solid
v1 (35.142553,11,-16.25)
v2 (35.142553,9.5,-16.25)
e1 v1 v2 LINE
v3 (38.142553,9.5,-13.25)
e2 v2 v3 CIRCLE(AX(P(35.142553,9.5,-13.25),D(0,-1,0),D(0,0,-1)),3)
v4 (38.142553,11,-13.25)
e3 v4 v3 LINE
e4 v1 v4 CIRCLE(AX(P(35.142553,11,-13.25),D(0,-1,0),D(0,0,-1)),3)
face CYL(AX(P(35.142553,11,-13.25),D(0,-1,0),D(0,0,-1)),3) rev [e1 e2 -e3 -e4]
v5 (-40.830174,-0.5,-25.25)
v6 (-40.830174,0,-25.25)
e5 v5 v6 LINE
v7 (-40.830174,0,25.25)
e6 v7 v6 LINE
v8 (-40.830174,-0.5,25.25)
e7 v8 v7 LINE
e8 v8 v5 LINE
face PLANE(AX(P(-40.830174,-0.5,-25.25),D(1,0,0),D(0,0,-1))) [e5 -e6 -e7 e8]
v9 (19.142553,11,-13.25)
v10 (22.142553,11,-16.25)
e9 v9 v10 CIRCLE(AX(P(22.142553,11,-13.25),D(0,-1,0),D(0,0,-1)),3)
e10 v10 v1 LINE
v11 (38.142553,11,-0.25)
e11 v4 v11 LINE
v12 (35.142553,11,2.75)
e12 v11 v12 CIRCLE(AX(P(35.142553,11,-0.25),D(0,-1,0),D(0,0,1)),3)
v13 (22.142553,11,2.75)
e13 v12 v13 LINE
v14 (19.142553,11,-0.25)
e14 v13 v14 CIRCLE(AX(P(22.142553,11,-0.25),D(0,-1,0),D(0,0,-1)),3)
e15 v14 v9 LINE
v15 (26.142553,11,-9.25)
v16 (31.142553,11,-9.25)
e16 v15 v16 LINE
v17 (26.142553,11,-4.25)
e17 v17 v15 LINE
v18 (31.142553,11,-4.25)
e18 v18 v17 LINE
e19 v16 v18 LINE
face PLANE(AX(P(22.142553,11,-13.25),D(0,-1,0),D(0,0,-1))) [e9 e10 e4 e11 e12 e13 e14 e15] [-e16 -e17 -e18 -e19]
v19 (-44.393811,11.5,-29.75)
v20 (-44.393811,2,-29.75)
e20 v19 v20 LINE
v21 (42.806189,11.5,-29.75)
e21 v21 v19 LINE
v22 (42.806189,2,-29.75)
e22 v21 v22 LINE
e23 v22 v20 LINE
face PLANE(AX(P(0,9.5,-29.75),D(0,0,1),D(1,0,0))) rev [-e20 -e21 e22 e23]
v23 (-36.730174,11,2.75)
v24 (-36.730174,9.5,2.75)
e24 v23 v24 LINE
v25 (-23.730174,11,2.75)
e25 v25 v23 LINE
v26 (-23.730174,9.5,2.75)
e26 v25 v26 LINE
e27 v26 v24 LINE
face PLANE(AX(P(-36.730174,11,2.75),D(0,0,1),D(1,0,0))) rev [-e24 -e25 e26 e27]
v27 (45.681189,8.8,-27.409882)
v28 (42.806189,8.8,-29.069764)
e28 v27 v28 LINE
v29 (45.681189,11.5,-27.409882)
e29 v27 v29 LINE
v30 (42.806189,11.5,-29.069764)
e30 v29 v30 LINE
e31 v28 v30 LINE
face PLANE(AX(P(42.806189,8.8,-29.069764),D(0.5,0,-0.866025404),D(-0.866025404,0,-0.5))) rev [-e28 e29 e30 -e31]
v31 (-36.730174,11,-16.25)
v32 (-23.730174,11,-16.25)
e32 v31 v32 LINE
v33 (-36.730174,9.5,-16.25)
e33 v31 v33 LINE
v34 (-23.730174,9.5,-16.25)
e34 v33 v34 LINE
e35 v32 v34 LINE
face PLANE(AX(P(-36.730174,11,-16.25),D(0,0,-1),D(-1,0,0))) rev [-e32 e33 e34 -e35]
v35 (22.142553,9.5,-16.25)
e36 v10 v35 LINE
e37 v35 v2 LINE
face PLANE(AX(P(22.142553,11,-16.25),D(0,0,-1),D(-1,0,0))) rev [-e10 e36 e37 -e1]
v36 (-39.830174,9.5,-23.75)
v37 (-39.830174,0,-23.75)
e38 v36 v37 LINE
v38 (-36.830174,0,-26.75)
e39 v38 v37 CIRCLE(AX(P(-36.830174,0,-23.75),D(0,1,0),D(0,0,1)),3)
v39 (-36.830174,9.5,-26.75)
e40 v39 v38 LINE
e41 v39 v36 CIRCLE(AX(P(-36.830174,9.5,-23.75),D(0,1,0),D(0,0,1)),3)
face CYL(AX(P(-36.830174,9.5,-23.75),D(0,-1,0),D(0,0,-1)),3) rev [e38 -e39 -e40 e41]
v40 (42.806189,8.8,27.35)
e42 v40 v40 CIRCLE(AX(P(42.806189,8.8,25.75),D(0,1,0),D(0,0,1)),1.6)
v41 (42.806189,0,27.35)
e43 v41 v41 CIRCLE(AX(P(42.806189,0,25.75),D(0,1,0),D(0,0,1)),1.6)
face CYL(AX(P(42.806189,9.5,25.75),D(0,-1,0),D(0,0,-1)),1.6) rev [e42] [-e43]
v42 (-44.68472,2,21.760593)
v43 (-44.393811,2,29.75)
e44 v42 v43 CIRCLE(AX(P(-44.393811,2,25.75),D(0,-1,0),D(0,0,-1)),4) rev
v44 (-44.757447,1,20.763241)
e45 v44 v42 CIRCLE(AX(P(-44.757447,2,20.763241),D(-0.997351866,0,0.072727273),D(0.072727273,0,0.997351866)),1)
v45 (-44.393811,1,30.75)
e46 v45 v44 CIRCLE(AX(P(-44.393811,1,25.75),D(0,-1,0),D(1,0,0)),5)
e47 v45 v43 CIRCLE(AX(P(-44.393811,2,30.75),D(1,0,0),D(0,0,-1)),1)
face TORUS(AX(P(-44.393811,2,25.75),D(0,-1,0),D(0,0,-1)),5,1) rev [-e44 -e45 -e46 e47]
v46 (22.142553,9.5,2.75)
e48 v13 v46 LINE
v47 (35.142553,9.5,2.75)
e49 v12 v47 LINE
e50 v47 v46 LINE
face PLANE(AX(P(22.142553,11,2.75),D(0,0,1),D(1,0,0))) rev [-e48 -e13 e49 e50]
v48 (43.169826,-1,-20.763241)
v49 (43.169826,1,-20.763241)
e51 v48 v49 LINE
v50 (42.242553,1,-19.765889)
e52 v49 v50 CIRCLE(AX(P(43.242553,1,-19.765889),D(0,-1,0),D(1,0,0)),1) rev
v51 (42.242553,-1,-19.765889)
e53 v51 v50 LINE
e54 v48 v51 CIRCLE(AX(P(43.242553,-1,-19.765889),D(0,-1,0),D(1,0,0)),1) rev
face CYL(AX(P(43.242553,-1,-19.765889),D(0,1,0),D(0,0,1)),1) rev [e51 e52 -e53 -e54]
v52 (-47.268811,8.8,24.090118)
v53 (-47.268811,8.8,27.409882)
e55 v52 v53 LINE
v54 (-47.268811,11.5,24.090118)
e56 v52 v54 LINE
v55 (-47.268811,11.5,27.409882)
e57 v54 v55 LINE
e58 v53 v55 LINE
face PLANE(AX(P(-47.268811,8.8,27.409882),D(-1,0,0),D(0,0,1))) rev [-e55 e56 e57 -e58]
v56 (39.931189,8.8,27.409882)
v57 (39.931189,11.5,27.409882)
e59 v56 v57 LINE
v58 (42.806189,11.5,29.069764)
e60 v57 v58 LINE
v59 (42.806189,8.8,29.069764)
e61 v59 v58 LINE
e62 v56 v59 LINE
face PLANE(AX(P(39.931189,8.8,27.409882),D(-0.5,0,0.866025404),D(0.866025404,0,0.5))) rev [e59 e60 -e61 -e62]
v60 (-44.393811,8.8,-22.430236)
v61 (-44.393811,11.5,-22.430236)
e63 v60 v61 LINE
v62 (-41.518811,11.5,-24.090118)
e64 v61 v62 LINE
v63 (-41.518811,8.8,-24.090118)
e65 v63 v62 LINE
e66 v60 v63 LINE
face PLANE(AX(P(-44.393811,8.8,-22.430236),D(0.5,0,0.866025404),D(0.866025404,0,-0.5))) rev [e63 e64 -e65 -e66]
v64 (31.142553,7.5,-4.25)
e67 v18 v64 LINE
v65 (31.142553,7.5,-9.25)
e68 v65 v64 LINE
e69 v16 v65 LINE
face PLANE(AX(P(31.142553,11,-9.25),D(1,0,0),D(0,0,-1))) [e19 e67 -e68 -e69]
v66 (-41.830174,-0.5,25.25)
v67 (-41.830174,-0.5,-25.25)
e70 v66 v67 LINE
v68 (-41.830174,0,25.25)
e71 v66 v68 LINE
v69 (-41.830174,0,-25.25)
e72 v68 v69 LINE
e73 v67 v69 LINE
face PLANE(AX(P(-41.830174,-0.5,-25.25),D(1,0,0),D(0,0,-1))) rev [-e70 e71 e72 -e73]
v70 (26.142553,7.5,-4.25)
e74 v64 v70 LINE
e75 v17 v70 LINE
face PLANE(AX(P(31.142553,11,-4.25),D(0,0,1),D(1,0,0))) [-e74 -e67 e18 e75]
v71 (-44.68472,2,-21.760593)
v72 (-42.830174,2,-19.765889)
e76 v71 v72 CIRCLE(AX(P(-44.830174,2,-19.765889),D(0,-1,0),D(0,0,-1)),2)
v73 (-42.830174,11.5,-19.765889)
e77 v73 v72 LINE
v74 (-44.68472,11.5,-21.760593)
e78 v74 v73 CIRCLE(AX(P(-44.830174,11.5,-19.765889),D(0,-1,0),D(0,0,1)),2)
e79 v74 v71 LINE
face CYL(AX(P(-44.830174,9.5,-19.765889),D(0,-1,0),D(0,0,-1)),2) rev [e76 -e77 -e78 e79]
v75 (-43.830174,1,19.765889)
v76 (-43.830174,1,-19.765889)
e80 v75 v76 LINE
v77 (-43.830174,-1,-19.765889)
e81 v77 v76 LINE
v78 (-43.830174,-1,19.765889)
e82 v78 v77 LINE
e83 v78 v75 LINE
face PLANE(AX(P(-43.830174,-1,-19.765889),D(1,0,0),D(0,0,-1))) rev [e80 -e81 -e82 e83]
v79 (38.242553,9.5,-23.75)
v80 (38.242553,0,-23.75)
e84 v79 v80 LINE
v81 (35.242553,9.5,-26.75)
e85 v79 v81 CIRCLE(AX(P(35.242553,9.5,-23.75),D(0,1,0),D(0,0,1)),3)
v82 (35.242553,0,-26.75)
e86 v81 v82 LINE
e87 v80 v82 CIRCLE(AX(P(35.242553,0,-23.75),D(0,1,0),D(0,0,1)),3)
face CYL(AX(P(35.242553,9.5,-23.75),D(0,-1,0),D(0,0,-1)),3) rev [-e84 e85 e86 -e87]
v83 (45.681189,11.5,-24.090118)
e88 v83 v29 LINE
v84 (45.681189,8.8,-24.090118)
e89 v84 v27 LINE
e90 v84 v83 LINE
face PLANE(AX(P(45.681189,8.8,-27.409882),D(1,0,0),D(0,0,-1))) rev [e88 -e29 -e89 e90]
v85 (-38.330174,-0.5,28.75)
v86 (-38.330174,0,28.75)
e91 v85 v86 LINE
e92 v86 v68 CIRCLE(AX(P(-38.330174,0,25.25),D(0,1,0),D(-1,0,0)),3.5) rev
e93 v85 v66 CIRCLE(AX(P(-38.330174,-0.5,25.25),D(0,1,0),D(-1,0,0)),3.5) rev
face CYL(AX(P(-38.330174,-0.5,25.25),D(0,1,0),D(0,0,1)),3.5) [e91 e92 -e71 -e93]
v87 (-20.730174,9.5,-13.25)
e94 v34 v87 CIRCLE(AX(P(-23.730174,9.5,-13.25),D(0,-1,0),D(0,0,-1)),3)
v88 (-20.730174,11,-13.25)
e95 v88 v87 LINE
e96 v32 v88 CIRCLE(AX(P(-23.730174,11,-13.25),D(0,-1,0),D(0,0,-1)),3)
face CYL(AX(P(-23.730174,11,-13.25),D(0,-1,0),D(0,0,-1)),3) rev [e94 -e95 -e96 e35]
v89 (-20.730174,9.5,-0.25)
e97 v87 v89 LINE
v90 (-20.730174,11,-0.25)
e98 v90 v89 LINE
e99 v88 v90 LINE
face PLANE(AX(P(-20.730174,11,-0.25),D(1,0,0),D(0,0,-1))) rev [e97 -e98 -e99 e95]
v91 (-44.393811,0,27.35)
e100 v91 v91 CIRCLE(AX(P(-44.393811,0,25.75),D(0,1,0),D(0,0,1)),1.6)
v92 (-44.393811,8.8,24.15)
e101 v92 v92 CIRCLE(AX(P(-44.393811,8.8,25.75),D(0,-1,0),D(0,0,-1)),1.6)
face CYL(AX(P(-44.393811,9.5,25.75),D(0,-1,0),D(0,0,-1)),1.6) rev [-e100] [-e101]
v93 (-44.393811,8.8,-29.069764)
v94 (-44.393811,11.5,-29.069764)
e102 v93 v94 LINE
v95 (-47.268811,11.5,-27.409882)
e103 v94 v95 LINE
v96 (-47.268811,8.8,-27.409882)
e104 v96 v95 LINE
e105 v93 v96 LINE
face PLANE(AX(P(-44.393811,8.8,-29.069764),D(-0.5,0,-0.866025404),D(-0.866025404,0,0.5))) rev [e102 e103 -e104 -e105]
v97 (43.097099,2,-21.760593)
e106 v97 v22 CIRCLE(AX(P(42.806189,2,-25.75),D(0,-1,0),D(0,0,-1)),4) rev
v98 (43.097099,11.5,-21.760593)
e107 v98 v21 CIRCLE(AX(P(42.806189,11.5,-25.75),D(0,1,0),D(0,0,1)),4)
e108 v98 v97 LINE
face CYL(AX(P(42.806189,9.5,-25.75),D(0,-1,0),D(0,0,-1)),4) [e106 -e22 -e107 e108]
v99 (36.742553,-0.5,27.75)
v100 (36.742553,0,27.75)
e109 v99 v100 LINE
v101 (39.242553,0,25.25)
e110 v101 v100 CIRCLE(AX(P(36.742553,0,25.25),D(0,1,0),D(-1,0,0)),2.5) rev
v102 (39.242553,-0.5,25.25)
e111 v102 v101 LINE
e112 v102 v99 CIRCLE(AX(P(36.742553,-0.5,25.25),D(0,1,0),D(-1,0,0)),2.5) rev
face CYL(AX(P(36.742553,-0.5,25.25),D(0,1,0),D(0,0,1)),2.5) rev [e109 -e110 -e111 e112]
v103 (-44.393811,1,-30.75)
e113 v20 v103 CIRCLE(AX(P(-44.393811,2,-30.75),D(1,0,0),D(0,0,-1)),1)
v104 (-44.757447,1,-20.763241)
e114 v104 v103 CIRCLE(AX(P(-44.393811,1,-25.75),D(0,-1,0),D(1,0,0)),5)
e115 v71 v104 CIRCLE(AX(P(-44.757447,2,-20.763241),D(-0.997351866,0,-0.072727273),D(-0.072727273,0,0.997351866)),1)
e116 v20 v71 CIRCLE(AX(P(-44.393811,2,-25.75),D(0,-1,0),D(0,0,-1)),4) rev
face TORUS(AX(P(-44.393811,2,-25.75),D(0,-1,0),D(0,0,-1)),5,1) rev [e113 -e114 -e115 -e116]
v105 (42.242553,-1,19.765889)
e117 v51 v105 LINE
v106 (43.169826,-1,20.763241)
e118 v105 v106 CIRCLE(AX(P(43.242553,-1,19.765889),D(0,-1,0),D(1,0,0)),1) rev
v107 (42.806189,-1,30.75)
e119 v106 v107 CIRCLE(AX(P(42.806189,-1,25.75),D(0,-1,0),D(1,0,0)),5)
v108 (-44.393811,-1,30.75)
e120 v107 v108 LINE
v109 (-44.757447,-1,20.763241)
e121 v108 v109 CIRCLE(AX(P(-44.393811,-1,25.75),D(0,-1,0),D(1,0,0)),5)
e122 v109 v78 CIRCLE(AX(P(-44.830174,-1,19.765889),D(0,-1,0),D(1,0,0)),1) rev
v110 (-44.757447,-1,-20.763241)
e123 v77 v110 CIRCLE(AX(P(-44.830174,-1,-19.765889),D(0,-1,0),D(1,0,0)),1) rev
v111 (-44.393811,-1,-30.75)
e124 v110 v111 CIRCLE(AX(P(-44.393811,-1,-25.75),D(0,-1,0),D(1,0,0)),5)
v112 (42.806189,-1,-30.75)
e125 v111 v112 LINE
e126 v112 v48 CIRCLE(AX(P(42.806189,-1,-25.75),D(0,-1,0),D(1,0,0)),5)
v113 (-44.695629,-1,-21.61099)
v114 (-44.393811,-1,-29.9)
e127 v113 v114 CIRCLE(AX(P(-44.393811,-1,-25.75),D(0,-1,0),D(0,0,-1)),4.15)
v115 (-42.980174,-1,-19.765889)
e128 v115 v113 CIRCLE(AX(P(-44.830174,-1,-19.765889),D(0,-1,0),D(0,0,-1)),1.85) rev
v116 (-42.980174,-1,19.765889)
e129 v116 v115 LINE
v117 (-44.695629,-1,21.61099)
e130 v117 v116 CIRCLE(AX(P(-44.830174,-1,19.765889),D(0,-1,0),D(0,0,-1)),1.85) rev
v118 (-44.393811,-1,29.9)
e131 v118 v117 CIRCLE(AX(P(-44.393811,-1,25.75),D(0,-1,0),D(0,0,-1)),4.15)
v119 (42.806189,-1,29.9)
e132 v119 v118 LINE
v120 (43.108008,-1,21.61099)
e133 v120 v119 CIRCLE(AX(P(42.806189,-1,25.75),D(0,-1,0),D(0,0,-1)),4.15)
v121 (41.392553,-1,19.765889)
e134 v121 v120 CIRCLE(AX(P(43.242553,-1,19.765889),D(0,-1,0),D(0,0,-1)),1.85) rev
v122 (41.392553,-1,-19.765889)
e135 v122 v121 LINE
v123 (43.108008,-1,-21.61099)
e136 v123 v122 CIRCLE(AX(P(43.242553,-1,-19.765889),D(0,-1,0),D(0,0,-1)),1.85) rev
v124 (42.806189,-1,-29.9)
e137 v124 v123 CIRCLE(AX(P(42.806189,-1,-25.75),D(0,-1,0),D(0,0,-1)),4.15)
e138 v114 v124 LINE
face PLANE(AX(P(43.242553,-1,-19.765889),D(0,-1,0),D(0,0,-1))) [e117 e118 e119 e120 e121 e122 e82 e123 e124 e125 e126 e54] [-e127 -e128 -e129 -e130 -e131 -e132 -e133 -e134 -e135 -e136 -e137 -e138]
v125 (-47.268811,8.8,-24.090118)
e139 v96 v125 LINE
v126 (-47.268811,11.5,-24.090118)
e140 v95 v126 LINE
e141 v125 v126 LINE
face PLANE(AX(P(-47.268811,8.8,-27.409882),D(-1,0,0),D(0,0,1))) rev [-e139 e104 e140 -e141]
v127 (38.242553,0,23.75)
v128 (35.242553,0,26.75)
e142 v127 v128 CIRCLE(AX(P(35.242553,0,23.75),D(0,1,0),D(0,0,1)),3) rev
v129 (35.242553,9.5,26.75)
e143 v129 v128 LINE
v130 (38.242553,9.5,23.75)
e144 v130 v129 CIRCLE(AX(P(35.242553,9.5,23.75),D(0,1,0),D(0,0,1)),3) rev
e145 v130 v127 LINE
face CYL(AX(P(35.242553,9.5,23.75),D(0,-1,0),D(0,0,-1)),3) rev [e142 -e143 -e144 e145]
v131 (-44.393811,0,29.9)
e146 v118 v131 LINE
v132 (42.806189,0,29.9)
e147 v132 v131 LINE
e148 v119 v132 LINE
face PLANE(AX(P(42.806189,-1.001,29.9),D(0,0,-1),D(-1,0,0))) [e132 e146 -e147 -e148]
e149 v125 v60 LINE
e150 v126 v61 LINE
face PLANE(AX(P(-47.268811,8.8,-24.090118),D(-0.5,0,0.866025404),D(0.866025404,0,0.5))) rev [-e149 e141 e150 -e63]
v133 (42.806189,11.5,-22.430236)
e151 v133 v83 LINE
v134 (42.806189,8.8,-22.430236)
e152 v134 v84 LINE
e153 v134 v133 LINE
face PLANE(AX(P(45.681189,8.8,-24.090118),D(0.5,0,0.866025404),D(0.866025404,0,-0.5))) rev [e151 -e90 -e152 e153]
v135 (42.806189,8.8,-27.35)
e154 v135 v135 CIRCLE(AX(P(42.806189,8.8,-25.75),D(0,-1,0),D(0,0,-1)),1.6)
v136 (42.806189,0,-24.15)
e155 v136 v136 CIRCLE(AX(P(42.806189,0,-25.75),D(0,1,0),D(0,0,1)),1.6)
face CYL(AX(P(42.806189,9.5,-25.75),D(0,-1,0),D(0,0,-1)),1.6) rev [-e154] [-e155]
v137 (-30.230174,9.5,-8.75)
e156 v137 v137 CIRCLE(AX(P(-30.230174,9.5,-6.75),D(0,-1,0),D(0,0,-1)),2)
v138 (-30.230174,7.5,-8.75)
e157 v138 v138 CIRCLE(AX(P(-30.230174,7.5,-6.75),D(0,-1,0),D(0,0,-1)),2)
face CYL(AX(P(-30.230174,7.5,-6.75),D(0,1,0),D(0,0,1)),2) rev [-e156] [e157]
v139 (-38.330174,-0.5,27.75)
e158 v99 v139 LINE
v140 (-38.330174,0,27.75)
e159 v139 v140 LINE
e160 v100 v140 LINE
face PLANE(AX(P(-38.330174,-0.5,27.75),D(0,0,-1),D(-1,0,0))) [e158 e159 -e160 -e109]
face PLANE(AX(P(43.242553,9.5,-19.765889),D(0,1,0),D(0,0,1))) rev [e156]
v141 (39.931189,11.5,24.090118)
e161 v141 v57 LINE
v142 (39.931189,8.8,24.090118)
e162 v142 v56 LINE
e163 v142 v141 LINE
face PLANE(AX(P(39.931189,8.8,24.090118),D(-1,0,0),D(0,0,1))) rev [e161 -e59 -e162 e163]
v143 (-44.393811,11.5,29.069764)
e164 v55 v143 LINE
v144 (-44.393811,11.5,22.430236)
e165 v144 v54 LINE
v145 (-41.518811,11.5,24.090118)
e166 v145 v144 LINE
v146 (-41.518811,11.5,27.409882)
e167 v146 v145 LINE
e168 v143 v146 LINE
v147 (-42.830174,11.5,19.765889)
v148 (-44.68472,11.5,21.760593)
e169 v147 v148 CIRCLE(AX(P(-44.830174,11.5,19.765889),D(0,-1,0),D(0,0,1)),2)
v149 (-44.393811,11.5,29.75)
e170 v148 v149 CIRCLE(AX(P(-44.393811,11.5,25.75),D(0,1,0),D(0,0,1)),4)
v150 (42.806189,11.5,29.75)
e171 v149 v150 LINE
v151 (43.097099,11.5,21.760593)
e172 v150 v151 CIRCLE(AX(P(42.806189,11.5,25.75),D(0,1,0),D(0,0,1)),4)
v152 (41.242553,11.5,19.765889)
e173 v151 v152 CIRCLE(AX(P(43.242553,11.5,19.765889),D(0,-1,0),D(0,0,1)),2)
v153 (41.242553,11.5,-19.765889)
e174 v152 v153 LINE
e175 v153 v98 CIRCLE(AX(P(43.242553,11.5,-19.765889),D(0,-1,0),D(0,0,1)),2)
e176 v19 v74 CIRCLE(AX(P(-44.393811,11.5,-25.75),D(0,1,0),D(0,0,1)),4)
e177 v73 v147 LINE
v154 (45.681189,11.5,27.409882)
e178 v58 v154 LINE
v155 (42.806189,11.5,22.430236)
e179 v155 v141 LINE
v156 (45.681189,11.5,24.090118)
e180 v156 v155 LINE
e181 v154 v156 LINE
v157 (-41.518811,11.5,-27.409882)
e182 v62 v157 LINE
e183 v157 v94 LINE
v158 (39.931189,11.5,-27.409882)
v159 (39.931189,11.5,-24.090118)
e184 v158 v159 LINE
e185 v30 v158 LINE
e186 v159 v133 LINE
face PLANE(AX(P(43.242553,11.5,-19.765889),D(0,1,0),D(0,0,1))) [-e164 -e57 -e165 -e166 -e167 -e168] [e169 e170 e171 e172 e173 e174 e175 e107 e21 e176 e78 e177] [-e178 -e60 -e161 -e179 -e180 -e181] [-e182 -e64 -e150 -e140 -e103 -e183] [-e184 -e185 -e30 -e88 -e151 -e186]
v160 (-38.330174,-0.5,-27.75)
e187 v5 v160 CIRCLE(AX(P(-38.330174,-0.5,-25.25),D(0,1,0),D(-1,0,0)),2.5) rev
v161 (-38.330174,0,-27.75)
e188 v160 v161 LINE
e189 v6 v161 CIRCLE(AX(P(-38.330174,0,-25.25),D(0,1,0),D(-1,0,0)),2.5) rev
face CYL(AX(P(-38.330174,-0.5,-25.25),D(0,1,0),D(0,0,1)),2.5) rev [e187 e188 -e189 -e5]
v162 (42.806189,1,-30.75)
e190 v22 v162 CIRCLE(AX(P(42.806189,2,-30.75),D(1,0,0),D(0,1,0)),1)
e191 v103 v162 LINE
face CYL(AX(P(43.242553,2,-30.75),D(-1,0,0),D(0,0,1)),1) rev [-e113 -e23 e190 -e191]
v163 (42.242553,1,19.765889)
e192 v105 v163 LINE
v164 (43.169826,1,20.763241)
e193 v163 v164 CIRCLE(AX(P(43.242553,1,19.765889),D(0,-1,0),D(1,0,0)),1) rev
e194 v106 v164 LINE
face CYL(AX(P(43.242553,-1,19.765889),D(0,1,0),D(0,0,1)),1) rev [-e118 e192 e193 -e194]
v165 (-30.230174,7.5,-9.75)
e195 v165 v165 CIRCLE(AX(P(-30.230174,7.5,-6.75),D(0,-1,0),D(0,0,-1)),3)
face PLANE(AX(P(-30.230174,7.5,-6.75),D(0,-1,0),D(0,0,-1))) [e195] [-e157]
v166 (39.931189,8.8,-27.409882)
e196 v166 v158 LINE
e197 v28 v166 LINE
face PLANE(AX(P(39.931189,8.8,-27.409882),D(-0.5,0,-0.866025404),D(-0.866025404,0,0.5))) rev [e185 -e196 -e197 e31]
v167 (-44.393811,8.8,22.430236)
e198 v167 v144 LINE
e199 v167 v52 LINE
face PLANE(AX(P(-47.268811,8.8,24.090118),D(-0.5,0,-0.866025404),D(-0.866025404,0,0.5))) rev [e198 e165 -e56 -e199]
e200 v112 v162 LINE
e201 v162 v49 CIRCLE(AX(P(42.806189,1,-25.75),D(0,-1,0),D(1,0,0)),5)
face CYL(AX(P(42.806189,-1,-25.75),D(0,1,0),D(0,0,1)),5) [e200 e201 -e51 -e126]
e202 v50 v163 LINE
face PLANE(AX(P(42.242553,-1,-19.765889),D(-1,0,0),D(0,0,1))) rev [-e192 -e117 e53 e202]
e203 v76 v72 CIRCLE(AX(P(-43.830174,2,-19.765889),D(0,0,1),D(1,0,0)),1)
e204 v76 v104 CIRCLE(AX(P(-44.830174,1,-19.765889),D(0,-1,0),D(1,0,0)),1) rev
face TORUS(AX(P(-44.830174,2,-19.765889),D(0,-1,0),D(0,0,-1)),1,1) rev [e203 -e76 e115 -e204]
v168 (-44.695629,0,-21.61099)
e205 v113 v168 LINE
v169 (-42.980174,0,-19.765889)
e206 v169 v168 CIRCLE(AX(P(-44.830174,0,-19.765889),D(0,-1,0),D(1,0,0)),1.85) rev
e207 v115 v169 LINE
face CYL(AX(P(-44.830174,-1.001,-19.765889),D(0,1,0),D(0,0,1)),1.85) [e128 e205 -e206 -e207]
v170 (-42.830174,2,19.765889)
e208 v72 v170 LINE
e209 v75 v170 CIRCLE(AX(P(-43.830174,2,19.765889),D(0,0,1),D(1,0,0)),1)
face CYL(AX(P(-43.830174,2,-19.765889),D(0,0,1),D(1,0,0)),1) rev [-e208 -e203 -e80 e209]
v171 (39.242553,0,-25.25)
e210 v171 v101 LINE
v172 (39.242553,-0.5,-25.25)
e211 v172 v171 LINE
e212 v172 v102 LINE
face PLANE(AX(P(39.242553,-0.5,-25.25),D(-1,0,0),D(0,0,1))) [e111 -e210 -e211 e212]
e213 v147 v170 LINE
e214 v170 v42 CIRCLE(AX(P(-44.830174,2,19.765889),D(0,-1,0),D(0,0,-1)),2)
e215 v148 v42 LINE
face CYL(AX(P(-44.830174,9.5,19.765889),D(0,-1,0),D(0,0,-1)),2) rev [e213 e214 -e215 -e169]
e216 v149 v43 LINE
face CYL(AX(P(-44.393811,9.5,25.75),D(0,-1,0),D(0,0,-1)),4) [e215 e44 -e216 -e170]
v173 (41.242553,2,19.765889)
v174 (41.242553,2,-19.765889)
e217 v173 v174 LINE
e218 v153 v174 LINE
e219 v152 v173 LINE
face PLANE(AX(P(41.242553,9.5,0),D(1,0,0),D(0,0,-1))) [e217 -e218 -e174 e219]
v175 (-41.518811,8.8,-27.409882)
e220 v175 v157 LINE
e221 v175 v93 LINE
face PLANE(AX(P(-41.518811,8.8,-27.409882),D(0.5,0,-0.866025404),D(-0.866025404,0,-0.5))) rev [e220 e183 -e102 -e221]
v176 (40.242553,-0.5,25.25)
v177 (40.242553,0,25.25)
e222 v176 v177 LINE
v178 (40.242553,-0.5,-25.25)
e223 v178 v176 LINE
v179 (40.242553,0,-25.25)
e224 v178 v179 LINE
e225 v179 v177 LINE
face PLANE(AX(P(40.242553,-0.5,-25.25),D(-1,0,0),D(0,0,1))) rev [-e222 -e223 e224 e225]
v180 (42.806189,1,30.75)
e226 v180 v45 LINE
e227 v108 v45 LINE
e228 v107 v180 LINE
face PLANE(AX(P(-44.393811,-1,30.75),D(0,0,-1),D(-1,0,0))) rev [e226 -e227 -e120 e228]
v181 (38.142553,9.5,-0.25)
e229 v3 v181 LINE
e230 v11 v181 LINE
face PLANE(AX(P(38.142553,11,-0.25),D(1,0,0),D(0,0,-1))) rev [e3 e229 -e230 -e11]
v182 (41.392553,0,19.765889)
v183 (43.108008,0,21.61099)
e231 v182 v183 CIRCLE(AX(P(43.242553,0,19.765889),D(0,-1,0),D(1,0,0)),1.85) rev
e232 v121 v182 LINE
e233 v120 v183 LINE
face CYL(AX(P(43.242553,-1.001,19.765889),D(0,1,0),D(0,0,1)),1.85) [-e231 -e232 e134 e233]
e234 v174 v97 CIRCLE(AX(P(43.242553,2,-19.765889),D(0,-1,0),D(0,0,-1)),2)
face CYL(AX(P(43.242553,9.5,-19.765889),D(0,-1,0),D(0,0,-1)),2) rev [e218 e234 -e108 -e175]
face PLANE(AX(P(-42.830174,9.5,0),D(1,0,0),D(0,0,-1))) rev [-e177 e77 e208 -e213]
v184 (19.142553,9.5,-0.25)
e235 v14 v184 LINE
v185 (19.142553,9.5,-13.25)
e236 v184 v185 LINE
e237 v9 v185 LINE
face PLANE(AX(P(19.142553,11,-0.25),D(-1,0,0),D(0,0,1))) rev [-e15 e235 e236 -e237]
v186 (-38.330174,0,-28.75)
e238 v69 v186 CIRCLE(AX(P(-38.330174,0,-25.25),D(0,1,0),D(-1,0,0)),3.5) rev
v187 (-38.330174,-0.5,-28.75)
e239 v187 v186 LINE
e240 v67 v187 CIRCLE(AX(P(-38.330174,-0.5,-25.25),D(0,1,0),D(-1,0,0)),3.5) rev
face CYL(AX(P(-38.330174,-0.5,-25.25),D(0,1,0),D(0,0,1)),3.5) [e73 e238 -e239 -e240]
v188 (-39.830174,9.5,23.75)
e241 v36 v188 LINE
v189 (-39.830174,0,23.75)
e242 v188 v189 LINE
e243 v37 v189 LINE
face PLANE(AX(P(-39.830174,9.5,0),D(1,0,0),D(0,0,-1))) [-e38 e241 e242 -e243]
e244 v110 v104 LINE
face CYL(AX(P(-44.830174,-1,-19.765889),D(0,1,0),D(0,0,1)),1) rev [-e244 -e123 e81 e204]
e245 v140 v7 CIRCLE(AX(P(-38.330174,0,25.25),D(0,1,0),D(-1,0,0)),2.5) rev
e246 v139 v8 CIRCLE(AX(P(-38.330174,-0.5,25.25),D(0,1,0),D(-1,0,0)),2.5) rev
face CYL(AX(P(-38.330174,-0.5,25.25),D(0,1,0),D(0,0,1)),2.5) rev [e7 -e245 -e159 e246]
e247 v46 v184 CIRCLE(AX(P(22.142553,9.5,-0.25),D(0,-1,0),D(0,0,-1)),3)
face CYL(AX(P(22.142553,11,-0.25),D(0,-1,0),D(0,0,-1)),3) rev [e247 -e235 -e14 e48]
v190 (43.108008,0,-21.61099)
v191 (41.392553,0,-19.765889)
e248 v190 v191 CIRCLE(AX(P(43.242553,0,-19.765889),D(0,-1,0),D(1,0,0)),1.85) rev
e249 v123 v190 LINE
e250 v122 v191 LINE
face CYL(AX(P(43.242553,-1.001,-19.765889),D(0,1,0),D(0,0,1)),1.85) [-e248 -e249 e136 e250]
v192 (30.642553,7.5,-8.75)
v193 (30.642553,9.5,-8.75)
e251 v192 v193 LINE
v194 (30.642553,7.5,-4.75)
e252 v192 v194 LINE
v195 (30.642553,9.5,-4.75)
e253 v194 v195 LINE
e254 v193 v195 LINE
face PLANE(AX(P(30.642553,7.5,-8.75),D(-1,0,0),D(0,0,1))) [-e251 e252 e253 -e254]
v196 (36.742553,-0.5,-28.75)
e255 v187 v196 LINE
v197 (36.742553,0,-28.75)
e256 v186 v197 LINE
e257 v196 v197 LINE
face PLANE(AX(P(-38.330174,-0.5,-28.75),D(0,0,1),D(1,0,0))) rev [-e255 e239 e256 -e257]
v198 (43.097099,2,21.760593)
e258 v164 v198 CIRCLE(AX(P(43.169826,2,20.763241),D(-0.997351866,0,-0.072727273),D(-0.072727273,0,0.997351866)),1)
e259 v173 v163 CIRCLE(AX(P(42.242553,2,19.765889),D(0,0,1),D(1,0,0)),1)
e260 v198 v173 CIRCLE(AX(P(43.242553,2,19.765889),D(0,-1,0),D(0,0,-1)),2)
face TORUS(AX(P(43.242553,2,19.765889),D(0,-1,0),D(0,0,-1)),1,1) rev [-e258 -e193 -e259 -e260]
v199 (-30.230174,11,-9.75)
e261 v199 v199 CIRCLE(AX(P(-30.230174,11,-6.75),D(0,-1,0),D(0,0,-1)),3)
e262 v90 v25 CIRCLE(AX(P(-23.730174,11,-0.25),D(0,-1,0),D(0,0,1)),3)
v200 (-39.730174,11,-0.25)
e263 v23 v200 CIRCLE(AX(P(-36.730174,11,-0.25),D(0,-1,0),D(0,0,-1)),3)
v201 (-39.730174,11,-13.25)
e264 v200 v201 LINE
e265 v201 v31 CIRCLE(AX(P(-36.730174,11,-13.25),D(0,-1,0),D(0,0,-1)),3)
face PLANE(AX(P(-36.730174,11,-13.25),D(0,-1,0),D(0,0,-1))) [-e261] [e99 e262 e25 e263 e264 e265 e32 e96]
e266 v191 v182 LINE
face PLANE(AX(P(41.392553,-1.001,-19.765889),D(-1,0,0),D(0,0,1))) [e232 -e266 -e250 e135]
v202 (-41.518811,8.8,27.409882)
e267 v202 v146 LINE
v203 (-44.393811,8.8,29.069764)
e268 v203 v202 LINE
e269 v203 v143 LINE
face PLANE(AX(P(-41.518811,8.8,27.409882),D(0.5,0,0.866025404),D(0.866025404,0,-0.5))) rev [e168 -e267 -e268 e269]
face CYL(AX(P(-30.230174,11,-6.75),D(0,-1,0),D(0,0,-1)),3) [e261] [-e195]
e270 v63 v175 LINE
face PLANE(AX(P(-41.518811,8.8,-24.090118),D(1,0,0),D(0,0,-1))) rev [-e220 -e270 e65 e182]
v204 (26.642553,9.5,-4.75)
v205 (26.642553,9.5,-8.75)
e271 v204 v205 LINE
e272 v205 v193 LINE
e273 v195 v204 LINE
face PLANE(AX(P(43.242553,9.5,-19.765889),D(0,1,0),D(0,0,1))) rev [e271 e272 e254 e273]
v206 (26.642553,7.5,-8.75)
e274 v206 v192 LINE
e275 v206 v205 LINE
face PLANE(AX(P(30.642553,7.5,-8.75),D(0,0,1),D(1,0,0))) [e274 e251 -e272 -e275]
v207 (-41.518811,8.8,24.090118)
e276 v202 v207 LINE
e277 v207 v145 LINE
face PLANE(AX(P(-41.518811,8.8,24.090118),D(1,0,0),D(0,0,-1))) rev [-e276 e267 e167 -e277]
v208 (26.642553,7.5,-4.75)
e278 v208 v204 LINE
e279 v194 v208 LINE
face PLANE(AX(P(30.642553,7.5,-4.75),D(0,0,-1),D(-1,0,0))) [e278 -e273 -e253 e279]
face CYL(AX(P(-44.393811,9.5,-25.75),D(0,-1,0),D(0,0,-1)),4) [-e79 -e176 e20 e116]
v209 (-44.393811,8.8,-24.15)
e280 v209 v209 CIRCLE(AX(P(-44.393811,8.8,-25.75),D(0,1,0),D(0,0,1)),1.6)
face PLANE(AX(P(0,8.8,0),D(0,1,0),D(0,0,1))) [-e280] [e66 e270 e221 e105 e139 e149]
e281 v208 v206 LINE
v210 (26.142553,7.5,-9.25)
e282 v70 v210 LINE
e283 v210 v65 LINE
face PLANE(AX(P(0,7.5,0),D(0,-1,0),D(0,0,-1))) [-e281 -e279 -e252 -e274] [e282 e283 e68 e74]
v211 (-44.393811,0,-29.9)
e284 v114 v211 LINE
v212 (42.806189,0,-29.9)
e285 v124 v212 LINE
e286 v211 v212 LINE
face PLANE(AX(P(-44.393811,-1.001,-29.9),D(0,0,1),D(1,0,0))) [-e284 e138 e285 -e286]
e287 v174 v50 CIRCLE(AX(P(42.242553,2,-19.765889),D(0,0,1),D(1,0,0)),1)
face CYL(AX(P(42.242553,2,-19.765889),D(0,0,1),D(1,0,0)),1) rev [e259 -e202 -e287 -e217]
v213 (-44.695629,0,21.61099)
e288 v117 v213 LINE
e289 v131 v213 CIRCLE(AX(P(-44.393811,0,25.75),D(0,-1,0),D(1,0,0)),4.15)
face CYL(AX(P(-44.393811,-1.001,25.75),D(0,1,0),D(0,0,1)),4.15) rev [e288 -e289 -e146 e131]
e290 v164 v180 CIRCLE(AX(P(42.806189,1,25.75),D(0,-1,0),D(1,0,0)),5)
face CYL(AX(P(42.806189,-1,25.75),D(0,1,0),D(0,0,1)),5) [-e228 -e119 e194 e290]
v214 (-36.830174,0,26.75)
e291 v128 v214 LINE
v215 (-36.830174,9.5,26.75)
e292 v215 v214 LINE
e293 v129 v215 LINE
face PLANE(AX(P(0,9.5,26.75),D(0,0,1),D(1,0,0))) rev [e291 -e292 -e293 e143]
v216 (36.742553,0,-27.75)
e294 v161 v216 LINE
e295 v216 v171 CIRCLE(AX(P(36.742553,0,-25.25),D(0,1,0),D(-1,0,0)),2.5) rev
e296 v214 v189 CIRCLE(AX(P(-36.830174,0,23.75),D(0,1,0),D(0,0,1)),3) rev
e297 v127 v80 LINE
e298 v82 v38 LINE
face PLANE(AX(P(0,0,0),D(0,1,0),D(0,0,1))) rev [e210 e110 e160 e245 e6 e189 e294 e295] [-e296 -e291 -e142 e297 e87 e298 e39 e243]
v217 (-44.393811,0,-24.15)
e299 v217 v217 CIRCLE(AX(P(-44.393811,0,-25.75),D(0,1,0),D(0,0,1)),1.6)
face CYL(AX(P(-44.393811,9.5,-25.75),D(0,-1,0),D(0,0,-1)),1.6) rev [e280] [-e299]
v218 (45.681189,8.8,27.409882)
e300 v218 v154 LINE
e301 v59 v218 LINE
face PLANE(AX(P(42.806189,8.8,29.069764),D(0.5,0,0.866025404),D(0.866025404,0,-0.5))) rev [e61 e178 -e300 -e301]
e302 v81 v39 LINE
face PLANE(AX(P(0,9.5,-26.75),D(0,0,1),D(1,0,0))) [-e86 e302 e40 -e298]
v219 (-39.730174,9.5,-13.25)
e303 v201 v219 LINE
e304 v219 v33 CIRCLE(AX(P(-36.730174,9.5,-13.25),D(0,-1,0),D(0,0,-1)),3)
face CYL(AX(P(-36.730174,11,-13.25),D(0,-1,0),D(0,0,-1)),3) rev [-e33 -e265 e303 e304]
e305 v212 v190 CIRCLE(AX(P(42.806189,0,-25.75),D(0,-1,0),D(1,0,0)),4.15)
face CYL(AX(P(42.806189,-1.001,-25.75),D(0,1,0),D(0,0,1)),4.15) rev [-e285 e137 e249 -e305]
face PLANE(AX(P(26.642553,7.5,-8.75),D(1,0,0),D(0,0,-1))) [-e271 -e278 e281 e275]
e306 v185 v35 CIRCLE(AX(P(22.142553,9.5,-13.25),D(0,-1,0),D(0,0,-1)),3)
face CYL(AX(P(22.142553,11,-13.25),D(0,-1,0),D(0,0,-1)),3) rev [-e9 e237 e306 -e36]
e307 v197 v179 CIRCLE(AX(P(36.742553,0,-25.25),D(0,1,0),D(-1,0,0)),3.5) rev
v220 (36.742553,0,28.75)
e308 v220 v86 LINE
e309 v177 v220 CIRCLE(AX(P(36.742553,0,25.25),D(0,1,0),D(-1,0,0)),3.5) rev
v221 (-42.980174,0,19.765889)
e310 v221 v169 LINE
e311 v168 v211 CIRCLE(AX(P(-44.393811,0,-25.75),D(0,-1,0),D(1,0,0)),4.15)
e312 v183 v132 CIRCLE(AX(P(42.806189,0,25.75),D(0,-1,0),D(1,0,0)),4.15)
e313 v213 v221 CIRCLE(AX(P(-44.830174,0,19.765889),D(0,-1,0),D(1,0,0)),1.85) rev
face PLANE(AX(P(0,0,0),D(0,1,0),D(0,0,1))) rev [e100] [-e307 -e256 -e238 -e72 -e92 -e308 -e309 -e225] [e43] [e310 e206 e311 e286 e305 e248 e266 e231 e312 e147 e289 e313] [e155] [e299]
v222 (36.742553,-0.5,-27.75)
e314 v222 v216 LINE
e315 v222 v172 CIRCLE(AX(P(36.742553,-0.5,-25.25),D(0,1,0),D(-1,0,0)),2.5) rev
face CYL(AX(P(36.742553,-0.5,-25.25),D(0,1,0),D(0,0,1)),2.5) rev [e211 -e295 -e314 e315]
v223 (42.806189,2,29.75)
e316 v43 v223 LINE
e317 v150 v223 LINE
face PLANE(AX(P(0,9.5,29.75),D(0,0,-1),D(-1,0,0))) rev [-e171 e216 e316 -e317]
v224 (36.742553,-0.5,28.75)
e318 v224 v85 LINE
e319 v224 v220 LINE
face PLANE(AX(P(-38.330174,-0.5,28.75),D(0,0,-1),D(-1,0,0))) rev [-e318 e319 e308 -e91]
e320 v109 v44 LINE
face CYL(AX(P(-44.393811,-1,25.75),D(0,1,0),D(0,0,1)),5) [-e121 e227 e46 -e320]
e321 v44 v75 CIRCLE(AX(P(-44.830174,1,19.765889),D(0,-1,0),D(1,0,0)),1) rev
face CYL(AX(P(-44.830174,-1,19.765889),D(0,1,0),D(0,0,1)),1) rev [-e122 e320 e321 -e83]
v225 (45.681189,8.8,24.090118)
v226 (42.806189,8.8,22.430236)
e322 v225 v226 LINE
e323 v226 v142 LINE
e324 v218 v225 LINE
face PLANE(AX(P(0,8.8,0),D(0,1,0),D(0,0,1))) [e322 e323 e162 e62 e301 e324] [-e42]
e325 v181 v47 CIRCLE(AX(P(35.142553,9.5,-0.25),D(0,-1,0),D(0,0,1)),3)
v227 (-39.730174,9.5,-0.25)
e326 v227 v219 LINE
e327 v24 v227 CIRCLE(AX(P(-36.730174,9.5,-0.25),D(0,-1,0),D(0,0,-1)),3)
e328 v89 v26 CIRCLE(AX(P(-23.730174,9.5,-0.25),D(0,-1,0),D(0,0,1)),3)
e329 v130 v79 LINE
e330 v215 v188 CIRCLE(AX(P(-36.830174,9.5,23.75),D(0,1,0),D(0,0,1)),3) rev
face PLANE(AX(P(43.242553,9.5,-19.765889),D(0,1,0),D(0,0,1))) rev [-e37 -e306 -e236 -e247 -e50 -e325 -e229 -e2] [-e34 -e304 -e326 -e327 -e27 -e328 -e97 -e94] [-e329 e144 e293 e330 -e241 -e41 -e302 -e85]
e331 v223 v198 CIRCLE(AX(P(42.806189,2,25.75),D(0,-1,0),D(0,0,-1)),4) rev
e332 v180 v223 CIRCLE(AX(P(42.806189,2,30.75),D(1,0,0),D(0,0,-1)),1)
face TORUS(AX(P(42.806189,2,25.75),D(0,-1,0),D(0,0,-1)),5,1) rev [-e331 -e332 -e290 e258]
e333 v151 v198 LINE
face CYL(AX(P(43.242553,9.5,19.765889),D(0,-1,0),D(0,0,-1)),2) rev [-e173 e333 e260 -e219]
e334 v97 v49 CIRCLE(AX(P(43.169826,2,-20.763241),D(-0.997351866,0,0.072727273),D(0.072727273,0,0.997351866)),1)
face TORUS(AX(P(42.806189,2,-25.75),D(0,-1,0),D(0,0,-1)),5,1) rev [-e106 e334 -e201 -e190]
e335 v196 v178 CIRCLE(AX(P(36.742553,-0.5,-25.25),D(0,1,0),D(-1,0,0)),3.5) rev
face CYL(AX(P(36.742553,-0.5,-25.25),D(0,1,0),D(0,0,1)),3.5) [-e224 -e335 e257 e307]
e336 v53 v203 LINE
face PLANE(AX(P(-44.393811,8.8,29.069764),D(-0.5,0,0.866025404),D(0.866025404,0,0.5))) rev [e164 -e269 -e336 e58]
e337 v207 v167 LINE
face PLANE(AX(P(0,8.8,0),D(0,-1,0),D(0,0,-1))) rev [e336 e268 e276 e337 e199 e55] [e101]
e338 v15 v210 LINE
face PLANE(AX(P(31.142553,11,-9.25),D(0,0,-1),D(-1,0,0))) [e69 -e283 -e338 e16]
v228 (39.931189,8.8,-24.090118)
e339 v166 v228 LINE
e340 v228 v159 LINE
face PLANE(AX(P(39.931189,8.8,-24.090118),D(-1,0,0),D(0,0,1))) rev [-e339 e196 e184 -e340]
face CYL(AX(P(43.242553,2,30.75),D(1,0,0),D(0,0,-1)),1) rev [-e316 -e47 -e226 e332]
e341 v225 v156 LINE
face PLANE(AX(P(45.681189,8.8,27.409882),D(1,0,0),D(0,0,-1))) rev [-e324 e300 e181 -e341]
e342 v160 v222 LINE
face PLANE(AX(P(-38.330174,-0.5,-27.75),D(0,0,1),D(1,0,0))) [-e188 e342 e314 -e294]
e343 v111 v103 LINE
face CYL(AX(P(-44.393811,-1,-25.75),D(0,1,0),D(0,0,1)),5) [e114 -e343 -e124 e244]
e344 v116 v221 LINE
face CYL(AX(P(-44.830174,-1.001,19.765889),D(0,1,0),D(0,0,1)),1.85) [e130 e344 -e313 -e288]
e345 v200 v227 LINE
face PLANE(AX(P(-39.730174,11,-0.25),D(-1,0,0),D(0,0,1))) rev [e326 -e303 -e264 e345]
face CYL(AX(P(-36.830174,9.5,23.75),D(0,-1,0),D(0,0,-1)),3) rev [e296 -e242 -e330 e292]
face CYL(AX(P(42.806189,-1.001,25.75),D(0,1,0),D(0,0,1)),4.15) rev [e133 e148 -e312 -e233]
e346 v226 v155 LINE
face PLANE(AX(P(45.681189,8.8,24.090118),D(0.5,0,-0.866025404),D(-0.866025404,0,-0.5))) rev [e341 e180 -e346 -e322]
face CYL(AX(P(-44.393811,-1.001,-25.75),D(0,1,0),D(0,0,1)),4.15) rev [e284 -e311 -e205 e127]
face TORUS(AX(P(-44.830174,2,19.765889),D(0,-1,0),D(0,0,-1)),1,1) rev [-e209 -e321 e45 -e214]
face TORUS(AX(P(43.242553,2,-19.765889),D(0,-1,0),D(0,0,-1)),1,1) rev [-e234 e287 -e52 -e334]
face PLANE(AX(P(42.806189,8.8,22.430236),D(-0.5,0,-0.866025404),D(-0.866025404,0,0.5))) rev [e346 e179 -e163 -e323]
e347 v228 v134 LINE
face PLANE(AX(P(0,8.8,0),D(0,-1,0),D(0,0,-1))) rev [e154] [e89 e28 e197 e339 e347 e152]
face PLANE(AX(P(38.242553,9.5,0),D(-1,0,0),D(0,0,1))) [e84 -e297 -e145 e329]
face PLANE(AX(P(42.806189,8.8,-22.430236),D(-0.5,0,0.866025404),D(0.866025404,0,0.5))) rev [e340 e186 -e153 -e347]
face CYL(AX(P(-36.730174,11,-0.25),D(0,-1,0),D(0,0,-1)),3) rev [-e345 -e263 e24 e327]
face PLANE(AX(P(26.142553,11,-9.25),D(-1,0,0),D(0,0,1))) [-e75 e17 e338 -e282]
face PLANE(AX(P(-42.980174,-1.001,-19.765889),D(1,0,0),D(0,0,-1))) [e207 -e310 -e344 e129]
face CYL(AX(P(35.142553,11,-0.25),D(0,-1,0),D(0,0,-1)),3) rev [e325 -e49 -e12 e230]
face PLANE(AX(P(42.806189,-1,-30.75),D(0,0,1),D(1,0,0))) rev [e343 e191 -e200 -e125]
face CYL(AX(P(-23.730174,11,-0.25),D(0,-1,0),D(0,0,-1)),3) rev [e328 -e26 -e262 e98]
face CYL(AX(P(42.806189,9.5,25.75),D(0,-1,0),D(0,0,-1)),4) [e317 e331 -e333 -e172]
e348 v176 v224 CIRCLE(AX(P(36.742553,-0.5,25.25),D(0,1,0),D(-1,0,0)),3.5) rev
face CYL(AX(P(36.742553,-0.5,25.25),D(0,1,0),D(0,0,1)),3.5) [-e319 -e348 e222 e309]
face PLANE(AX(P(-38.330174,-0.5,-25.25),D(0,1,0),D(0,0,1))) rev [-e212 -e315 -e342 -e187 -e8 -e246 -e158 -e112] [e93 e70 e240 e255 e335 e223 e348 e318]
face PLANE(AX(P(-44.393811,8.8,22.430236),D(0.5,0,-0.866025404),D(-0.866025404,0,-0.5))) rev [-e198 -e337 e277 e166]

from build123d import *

# Parameters (mm, degrees)
SKETCH_1_R            = 1.6
EXTRUDE_1_DEPTH       = 9.5
SKETCH_2_R            = 1.6
EXTRUDE_2_DEPTH       = 2
CUT_EXTRUDE_1_DEPTH   = 2.7
EXTRUDE_1_2_DEPTH     = 0.5
EXTRUDE_2_2_DEPTH     = 1
FILLET_1_R            = 1
CUT_EXTRUDE_1_2_REACH = 61.309
SKETCH_8_R            = 3
SKETCH_8_W            = 5
SKETCH_8_H            = 5
CUT_EXTRUDE_2_DEPTH   = 1.5
EXTRUDE_START         = 2
SKETCH_10_R           = 3
SKETCH_10_R_2         = 2
SKETCH_10_W           = 5
SKETCH_10_H           = 5
SKETCH_10_W_2         = 4
SKETCH_10_H_2         = 4
EXTRUDE_3_DEPTH       = 2


with BuildPart() as part:
    # Эскиз1 → Extrude 1 (new body)
    with BuildSketch(Plane(origin=(0, 0, 0), x_dir=(1, 0, 0), z_dir=(0, 1, 0))):
        with BuildLine():
            Line((-42.830174167, 19.765888806), (-42.830174167, -19.765888806))
            ThreePointArc((-42.830174167, -19.765888806), (-43.365437144, -21.127705775), (-44.684719621, -21.760592538))
            ThreePointArc((-44.684719621, -21.760592538), (-48.391161519, -25.895550937), (-44.39381053, -29.75))
            Line((-44.39381053, -29.75), (42.80618947, -29.75))
            ThreePointArc((42.80618947, -29.75), (46.803540458, -25.895550937), (43.097098561, -21.760592538))
            ThreePointArc((43.097098561, -21.760592538), (41.777816084, -21.127705775), (41.242553106, -19.765888806))
            Line((41.242553106, -19.765888806), (41.242553106, 19.765888806))
            ThreePointArc((41.242553106, 19.765888806), (41.777816084, 21.127705775), (43.097098561, 21.760592538))
            ThreePointArc((43.097098561, 21.760592538), (46.803540458, 25.895550937), (42.80618947, 29.75))
            Line((42.80618947, 29.75), (-44.39381053, 29.75))
            ThreePointArc((-44.39381053, 29.75), (-48.391161519, 25.895550937), (-44.684719621, 21.760592538))
            ThreePointArc((-44.684719621, 21.760592538), (-43.365437144, 21.127705775), (-42.830174167, 19.765888806))
        make_face()
        with Locations(Location((-44.39381053, -25.75, 0), (0, 0, 270))):
            Circle(SKETCH_1_R, mode=Mode.SUBTRACT)
        with Locations(Location((-44.39381053, 25.75, 0), (0, 0, 270))):
            Circle(SKETCH_1_R, mode=Mode.SUBTRACT)
        with Locations(Location((42.80618947, 25.75, 0), (0, 0, 270))):
            Circle(SKETCH_1_R, mode=Mode.SUBTRACT)
        with Locations(Location((42.80618947, -25.75, 0), (0, 0, 270))):
            Circle(SKETCH_1_R, mode=Mode.SUBTRACT)
        with BuildLine():
            Line((38.242553106, -23.75), (38.242553106, 23.75))
            ThreePointArc((38.242553106, 23.75), (37.36387345, 25.871320344), (35.242553106, 26.75))
            Line((35.242553106, 26.75), (-36.830174167, 26.75))
            ThreePointArc((-36.830174167, 26.75), (-38.95149451, 25.871320344), (-39.830174167, 23.75))
            Line((-39.830174167, 23.75), (-39.830174167, -23.75))
            ThreePointArc((-39.830174167, -23.75), (-38.95149451, -25.871320344), (-36.830174167, -26.75))
            Line((-36.830174167, -26.75), (35.242553106, -26.75))
            ThreePointArc((35.242553106, -26.75), (37.36387345, -25.871320344), (38.242553106, -23.75))
        make_face(mode=Mode.SUBTRACT)
    extrude(amount=EXTRUDE_1_DEPTH)

    # Эскиз2 → Extrude 2 (add)
    with BuildSketch(Plane(origin=(0, 9.5, 0), x_dir=(1, 0, 0), z_dir=(0, 1, 0))):
        with BuildLine():
            Line((41.242553106, 19.765888806), (41.242553106, -19.765888806))
            ThreePointArc((41.242553106, -19.765888806), (41.777816084, -21.127705775), (43.097098561, -21.760592538))
            ThreePointArc((43.097098561, -21.760592538), (46.803540458, -25.895550937), (42.80618947, -29.75))
            Line((42.80618947, -29.75), (-44.39381053, -29.75))
            ThreePointArc((-44.39381053, -29.75), (-48.391161519, -25.895550937), (-44.684719621, -21.760592538))
            ThreePointArc((-44.684719621, -21.760592538), (-43.365437144, -21.127705775), (-42.830174167, -19.765888806))
            Line((-42.830174167, -19.765888806), (-42.830174167, 19.765888806))
            ThreePointArc((-42.830174167, 19.765888806), (-43.365437144, 21.127705775), (-44.684719621, 21.760592538))
            ThreePointArc((-44.684719621, 21.760592538), (-48.391161519, 25.895550937), (-44.39381053, 29.75))
            Line((-44.39381053, 29.75), (42.80618947, 29.75))
            ThreePointArc((42.80618947, 29.75), (46.803540458, 25.895550937), (43.097098561, 21.760592538))
            ThreePointArc((43.097098561, 21.760592538), (41.777816084, 21.127705775), (41.242553106, 19.765888806))
        make_face()
        with Locations(Location((42.80618947, 25.75, 0), (0, 0, 270))):
            Circle(SKETCH_2_R, mode=Mode.SUBTRACT)
        with Locations(Location((42.80618947, -25.75, 0), (0, 0, 270))):
            Circle(SKETCH_2_R, mode=Mode.SUBTRACT)
        with Locations(Location((-44.39381053, -25.75, 0), (0, 0, 270))):
            Circle(SKETCH_2_R, mode=Mode.SUBTRACT)
        with Locations(Location((-44.39381053, 25.75, 0), (0, 0, 270))):
            Circle(SKETCH_2_R, mode=Mode.SUBTRACT)
    extrude(amount=EXTRUDE_2_DEPTH)

    # Эскиз3 → Cut-Extrude 1 (cut)
    with BuildSketch(Plane(origin=(0, 11.5, 0), x_dir=(1, 0, 0), z_dir=(0, 1, 0))):
        Polygon((-44.39381053, 22.430235952), (-41.51881053, 24.090117976), (-41.51881053, 27.409882024), (-44.39381053, 29.069764048), (-47.26881053, 27.409882024), (-47.26881053, 24.090117976), align=None)
        Polygon((45.68118947, 24.090117976), (42.80618947, 22.430235952), (39.93118947, 24.090117976), (39.93118947, 27.409882024), (42.80618947, 29.069764048), (45.68118947, 27.409882024), align=None)
        Polygon((42.80618947, -22.430235952), (39.93118947, -24.090117976), (39.93118947, -27.409882024), (42.80618947, -29.069764048), (45.68118947, -27.409882024), (45.68118947, -24.090117976), align=None)
        Polygon((-47.26881053, -24.090117976), (-44.39381053, -22.430235952), (-41.51881053, -24.090117976), (-41.51881053, -27.409882024), (-44.39381053, -29.069764048), (-47.26881053, -27.409882024), align=None)
    extrude(amount=-CUT_EXTRUDE_1_DEPTH, mode=Mode.SUBTRACT)

    # Эскиз4 → Extrude 1 2 (add)
    with BuildSketch(Plane.XZ):
        with BuildLine():
            Line((-38.330174167, 28.75), (36.742553106, 28.75))
            ThreePointArc((36.742553106, 28.75), (39.21742684, 27.724873734), (40.242553106, 25.25))
            Line((40.242553106, 25.25), (40.242553106, -25.25))
            ThreePointArc((40.242553106, -25.25), (39.21742684, -27.724873734), (36.742553106, -28.75))
            Line((36.742553106, -28.75), (-38.330174167, -28.75))
            ThreePointArc((-38.330174167, -28.75), (-40.805047901, -27.724873734), (-41.830174167, -25.25))
            Line((-41.830174167, -25.25), (-41.830174167, 25.25))
            ThreePointArc((-41.830174167, 25.25), (-40.805047901, 27.724873734), (-38.330174167, 28.75))
        make_face()
        with BuildLine():
            Line((-38.330174167, 27.75), (36.742553106, 27.75))
            ThreePointArc((36.742553106, 27.75), (38.510320059, 27.017766953), (39.242553106, 25.25))
            Line((39.242553106, 25.25), (39.242553106, -25.25))
            ThreePointArc((39.242553106, -25.25), (38.510320059, -27.017766953), (36.742553106, -27.75))
            Line((36.742553106, -27.75), (-38.330174167, -27.75))
            ThreePointArc((-38.330174167, -27.75), (-40.09794112, -27.017766953), (-40.830174167, -25.25))
            Line((-40.830174167, -25.25), (-40.830174167, 25.25))
            ThreePointArc((-40.830174167, 25.25), (-40.09794112, 27.017766953), (-38.330174167, 27.75))
        make_face(mode=Mode.SUBTRACT)
    extrude(amount=EXTRUDE_1_2_DEPTH)

    # Эскиз5 → Extrude 2 2 (add, symmetric)
    with BuildSketch(Plane.XZ):
        with BuildLine():
            ThreePointArc((43.169825833, 20.763240672), (42.510184595, 20.44679729), (42.242553106, 19.765888806))
            Line((42.242553106, 19.765888806), (42.242553106, -19.765888806))
            ThreePointArc((42.242553106, -19.765888806), (42.510184595, -20.44679729), (43.169825833, -20.763240672))
            ThreePointArc((43.169825833, -20.763240672), (47.802878205, -25.931938671), (42.80618947, -30.75))
            Line((42.80618947, -30.75), (-44.39381053, -30.75))
            ThreePointArc((-44.39381053, -30.75), (-49.390499266, -25.931938671), (-44.757446894, -20.763240672))
            ThreePointArc((-44.757446894, -20.763240672), (-44.097805655, -20.44679729), (-43.830174167, -19.765888806))
            Line((-43.830174167, -19.765888806), (-43.830174167, 19.765888806))
            ThreePointArc((-43.830174167, 19.765888806), (-44.097805655, 20.44679729), (-44.757446894, 20.763240672))
            ThreePointArc((-44.757446894, 20.763240672), (-49.390499266, 25.931938671), (-44.39381053, 30.75))
            Line((-44.39381053, 30.75), (42.80618947, 30.75))
            ThreePointArc((42.80618947, 30.75), (47.802878205, 25.931938671), (43.169825833, 20.763240672))
        make_face()
        with BuildLine():
            ThreePointArc((43.097098561, 21.760592538), (41.777816084, 21.127705775), (41.242553106, 19.765888806))
            Line((41.242553106, 19.765888806), (41.242553106, -19.765888806))
            ThreePointArc((41.242553106, -19.765888806), (41.777816084, -21.127705775), (43.097098561, -21.760592538))
            ThreePointArc((43.097098561, -21.760592538), (46.803540458, -25.895550937), (42.80618947, -29.75))
            Line((42.80618947, -29.75), (-44.39381053, -29.75))
            ThreePointArc((-44.39381053, -29.75), (-48.391161519, -25.895550937), (-44.684719621, -21.760592538))
            ThreePointArc((-44.684719621, -21.760592538), (-43.365437144, -21.127705775), (-42.830174167, -19.765888806))
            Line((-42.830174167, -19.765888806), (-42.830174167, 19.765888806))
            ThreePointArc((-42.830174167, 19.765888806), (-43.365437144, 21.127705775), (-44.684719621, 21.760592538))
            ThreePointArc((-44.684719621, 21.760592538), (-48.391161519, 25.895550937), (-44.39381053, 29.75))
            Line((-44.39381053, 29.75), (42.80618947, 29.75))
            ThreePointArc((42.80618947, 29.75), (46.803540458, 25.895550937), (43.097098561, 21.760592538))
        make_face(mode=Mode.SUBTRACT)
    extrude(amount=EXTRUDE_2_2_DEPTH, both=True)

    # Скругление1
    fillet_1_edges = [part.edges().sort_by_distance(p)[0] for p in [
        (41.777816084, 1, -21.127705775),
        (41.242553106, 1, 0),
        (41.777816084, 1, 21.127705775),
        (46.803540458, 1, 25.895550937),
        (-0.79381053, 1, 29.75),
        (-48.391161519, 1, 25.895550937),
        (-43.365437144, 1, 21.127705775),
        (-42.830174167, 1, 0),
        (-43.365437144, 1, -21.127705775),
        (-48.391161519, 1, -25.895550937),
        (-0.79381053, 1, -29.75),
        (46.803540458, 1, -25.895550937),
    ]]
    fillet(fillet_1_edges, radius=FILLET_1_R - 0.0001)  # a hair under: the kernel refuses the full size

    # Эскиз6 → Cut-Extrude 1 2 (cut, up to next)
    with BuildSketch(Plane.XZ, mode=Mode.PRIVATE) as cut_extrude_1_2_sk1:
        with BuildLine():
            Line((42.80618947, 29.9), (-44.39381053, 29.9))
            ThreePointArc((-44.39381053, 29.9), (-48.541062181, 25.901009097), (-44.695628712, 21.610989758))
            ThreePointArc((-44.695628712, 21.610989758), (-43.475292421, 21.025569502), (-42.980174167, 19.765888806))
            Line((-42.980174167, 19.765888806), (-42.980174167, -19.765888806))
            ThreePointArc((-42.980174167, -19.765888806), (-43.475292421, -21.025569502), (-44.695628712, -21.610989758))
            ThreePointArc((-44.695628712, -21.610989758), (-48.541062181, -25.901009097), (-44.39381053, -29.9))
            Line((-44.39381053, -29.9), (42.80618947, -29.9))
            ThreePointArc((42.80618947, -29.9), (46.95344112, -25.901009097), (43.108007652, -21.610989758))
            ThreePointArc((43.108007652, -21.610989758), (41.88767136, -21.025569502), (41.392553106, -19.765888806))
            Line((41.392553106, -19.765888806), (41.392553106, 19.765888806))
            ThreePointArc((41.392553106, 19.765888806), (41.88767136, 21.025569502), (43.108007652, 21.610989758))
            ThreePointArc((43.108007652, 21.610989758), (46.95344112, 25.901009097), (42.80618947, 29.9))
        make_face()
        with BuildLine():
            Line((42.80618947, 29.75), (-44.39381053, 29.75))
            ThreePointArc((-44.39381053, 29.75), (-48.391161519, 25.895550937), (-44.684719621, 21.760592538))
            ThreePointArc((-44.684719621, 21.760592538), (-43.365437144, 21.127705775), (-42.830174167, 19.765888806))
            Line((-42.830174167, 19.765888806), (-42.830174167, -19.765888806))
            ThreePointArc((-42.830174167, -19.765888806), (-43.365437144, -21.127705775), (-44.684719621, -21.760592538))
            ThreePointArc((-44.684719621, -21.760592538), (-48.391161519, -25.895550937), (-44.39381053, -29.75))
            Line((-44.39381053, -29.75), (42.80618947, -29.75))
            ThreePointArc((42.80618947, -29.75), (46.803540458, -25.895550937), (43.097098561, -21.760592538))
            ThreePointArc((43.097098561, -21.760592538), (41.777816084, -21.127705775), (41.242553106, -19.765888806))
            Line((41.242553106, -19.765888806), (41.242553106, 19.765888806))
            ThreePointArc((41.242553106, 19.765888806), (41.777816084, 21.127705775), (43.097098561, 21.760592538))
            ThreePointArc((43.097098561, 21.760592538), (46.803540458, 25.895550937), (42.80618947, 29.75))
        make_face(mode=Mode.SUBTRACT)
    cut_extrude_1_2_tool1 = extrude(cut_extrude_1_2_sk1.sketch, amount=CUT_EXTRUDE_1_2_REACH, mode=Mode.PRIVATE) & part.part
    add(cut_extrude_1_2_tool1.solids().sort_by_distance((41.80515, 0, 21.102293))[0], mode=Mode.SUBTRACT)

    # Эскиз8 → Вырез-Вытянуть2 (cut)
    # profile 1 of 2: a face of its own
    with BuildSketch(Plane.XZ.offset(-9.5)):
        with BuildLine():
            Line((-36.730174167, 2.75), (-23.730174167, 2.75))
            ThreePointArc((-23.730174167, 2.75), (-21.608853823, 1.871320344), (-20.730174167, -0.25))
            Line((-20.730174167, -0.25), (-20.730174167, -13.25))
            ThreePointArc((-20.730174167, -13.25), (-21.608853823, -15.371320344), (-23.730174167, -16.25))
            Line((-23.730174167, -16.25), (-36.730174167, -16.25))
            ThreePointArc((-36.730174167, -16.25), (-38.85149451, -15.371320344), (-39.730174167, -13.25))
            Line((-39.730174167, -13.25), (-39.730174167, -0.25))
            ThreePointArc((-39.730174167, -0.25), (-38.85149451, 1.871320344), (-36.730174167, 2.75))
        make_face()
        with Locations(Location((-30.230174167, -6.75, 0), (0, 0, 270))):
            Circle(SKETCH_8_R, mode=Mode.SUBTRACT)
    # profile 2 of 2: a face of its own
    with BuildSketch(Plane.XZ.offset(-9.5)):
        with BuildLine():
            Line((22.142553106, 2.75), (35.142553106, 2.75))
            ThreePointArc((35.142553106, 2.75), (37.26387345, 1.871320344), (38.142553106, -0.25))
            Line((38.142553106, -0.25), (38.142553106, -13.25))
            ThreePointArc((38.142553106, -13.25), (37.26387345, -15.371320344), (35.142553106, -16.25))
            Line((35.142553106, -16.25), (22.142553106, -16.25))
            ThreePointArc((22.142553106, -16.25), (20.021232763, -15.371320344), (19.142553106, -13.25))
            Line((19.142553106, -13.25), (19.142553106, -0.25))
            ThreePointArc((19.142553106, -0.25), (20.021232763, 1.871320344), (22.142553106, 2.75))
        make_face()
        with Locations((28.642553106, -6.75)):
            Rectangle(SKETCH_8_W, SKETCH_8_H, mode=Mode.SUBTRACT)
    extrude(amount=-CUT_EXTRUDE_2_DEPTH, mode=Mode.SUBTRACT)

    # Эскиз10 → Бобышка-Вытянуть3 (add)
    # profile 1 of 2: a face of its own
    with BuildSketch(Plane.XZ.offset(-9.5).offset(EXTRUDE_START)):
        with Locations(Location((-30.230174167, -6.75, 0), (0, 0, 270))):
            Circle(SKETCH_10_R)
        with Locations(Location((-30.230174167, -6.75, 0), (0, 0, 270))):
            Circle(SKETCH_10_R_2, mode=Mode.SUBTRACT)
    # profile 2 of 2: a face of its own
    with BuildSketch(Plane.XZ.offset(-9.5).offset(EXTRUDE_START)):
        with Locations((28.642553106, -6.75)):
            Rectangle(SKETCH_10_W, SKETCH_10_H)
        with Locations((28.642553106, -6.75)):
            Rectangle(SKETCH_10_W_2, SKETCH_10_H_2, mode=Mode.SUBTRACT)
    extrude(amount=-EXTRUDE_3_DEPTH)


solid = part.part
